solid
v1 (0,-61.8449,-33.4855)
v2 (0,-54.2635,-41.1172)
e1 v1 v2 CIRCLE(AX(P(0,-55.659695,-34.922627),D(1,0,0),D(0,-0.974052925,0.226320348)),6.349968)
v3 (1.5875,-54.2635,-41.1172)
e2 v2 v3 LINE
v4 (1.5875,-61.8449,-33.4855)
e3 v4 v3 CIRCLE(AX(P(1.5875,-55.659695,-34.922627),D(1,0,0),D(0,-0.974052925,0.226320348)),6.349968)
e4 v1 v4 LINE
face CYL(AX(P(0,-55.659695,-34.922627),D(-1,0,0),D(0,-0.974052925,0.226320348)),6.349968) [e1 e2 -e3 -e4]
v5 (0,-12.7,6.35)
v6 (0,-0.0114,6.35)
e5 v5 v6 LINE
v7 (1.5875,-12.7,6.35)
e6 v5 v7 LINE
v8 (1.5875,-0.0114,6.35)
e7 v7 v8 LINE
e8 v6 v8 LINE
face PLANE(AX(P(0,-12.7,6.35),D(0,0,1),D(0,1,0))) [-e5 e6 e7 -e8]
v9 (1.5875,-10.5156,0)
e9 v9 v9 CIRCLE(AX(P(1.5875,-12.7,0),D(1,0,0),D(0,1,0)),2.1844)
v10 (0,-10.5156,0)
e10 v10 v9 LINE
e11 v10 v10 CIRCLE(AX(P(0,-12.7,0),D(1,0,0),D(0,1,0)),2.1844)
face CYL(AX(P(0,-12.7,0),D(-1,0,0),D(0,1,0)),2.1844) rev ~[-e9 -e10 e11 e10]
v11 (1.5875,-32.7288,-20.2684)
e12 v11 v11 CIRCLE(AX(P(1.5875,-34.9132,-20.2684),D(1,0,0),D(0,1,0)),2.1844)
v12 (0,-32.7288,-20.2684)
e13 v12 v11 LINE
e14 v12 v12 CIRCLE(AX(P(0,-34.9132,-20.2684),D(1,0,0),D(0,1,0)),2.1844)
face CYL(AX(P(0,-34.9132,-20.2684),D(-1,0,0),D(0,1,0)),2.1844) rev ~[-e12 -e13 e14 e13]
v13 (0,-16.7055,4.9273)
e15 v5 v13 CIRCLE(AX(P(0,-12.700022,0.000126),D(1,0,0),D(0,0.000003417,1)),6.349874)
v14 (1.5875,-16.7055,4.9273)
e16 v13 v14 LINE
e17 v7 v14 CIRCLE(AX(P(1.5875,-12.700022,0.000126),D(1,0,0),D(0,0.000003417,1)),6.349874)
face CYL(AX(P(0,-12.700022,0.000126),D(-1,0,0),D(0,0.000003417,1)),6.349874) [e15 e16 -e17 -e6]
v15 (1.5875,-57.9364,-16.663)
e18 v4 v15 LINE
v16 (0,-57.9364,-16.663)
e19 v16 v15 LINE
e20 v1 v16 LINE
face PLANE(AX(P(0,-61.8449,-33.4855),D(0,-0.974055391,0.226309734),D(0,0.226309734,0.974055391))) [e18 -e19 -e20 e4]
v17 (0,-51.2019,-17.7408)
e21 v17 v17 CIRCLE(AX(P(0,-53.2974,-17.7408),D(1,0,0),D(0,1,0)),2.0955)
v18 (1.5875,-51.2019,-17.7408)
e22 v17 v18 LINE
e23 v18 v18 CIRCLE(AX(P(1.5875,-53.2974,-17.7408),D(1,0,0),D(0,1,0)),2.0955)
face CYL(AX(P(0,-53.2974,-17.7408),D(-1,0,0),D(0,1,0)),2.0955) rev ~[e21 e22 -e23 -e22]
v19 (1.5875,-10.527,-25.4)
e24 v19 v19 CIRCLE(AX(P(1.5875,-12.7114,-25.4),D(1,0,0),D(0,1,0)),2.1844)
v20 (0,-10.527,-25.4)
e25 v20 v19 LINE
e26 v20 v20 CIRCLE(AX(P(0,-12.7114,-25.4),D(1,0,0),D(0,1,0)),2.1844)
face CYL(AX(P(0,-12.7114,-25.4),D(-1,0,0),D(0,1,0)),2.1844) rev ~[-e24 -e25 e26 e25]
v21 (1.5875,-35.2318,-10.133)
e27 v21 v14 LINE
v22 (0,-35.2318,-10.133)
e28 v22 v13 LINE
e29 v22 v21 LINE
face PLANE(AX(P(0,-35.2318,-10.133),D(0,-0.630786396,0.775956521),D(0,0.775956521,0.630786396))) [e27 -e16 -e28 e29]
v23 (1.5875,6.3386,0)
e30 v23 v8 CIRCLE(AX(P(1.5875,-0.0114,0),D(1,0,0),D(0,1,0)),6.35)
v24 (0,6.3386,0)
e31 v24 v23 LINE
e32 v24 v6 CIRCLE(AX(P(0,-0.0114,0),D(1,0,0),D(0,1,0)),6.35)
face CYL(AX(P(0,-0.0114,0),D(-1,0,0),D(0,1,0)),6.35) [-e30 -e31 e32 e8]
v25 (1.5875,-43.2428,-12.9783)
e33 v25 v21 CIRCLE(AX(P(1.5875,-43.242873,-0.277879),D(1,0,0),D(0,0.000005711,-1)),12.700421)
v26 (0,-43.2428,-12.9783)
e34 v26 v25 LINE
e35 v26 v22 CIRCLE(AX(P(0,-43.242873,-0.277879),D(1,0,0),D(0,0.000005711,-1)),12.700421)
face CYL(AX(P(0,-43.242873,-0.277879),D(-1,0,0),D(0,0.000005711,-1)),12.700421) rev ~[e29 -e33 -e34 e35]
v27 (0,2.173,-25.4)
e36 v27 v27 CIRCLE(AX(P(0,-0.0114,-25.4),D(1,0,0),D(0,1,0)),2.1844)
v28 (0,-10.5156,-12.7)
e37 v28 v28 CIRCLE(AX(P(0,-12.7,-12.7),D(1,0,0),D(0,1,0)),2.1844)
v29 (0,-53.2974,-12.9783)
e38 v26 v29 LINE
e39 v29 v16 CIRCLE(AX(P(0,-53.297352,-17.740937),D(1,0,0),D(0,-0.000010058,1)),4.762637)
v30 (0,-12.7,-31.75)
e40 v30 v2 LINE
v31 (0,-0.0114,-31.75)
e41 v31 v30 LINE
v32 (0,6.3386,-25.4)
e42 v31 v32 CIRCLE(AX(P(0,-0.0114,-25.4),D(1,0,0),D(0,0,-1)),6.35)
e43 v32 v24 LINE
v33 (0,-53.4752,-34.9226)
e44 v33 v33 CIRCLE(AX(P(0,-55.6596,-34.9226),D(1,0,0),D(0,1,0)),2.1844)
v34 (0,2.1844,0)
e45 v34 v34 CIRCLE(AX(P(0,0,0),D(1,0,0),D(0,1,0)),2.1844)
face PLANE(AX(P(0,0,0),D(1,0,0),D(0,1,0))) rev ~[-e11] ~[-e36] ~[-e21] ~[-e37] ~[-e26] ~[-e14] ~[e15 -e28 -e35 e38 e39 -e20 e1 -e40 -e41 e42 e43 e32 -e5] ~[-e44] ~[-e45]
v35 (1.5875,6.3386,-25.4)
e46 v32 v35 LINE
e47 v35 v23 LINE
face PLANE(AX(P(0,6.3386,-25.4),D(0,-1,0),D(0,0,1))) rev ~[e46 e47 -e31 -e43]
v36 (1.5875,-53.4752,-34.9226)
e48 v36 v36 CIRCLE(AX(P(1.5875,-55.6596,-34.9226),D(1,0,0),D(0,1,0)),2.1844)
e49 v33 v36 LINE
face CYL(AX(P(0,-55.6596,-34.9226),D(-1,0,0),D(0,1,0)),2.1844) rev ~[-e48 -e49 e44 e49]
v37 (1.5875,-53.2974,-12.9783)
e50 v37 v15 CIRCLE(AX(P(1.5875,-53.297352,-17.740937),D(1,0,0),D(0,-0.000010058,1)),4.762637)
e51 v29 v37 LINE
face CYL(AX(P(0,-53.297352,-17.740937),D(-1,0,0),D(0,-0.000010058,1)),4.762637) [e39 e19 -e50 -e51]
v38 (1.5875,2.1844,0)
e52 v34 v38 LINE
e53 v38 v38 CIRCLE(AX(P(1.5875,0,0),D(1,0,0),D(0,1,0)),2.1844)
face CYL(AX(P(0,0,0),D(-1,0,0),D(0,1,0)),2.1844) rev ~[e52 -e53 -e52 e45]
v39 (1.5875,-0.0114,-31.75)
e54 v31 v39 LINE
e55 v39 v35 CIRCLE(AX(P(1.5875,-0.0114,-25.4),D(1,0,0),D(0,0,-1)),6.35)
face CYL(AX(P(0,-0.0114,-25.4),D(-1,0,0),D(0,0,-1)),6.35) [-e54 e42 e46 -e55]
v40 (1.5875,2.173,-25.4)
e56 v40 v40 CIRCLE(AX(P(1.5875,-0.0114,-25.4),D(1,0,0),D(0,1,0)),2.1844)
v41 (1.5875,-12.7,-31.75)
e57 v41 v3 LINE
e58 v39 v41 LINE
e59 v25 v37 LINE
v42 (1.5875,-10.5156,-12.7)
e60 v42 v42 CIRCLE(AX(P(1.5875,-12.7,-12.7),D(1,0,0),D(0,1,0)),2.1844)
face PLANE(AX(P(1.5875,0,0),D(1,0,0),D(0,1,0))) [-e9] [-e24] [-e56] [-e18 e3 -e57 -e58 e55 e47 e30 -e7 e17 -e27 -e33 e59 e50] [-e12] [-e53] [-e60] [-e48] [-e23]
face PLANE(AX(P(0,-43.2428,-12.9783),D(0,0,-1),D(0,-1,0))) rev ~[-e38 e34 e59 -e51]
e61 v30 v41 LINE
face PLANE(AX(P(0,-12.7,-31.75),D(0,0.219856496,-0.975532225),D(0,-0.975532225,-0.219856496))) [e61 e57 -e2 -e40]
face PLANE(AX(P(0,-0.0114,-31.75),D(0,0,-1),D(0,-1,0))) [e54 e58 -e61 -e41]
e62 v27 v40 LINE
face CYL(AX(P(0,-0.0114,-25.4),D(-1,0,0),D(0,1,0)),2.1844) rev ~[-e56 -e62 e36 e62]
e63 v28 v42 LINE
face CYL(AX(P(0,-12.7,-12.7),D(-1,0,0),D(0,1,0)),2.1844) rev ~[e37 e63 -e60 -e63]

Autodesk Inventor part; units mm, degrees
ref_plane "YZ Plane" through (0, 0, 0) normal (1, 0, 0) x (0, 1, 0)
ref_plane "XZ Plane" through (0, 0, 0) normal (0, 1, 0) x (-1, 0, 0)
ref_plane "XY Plane" through (0, 0, 0) normal (0, 0, 1) x (1, 0, 0)
sketch "maiin" plane through (0, 0, 0) normal (0, 0, 1) x (1, 0, 0)
  circle A0 centre (-6.5018, 3.4753) radius 2.1844
  line L0 (-6.8203, 13.6107) -> (11.7059, 28.671)
  circle A1 centre (-27.2482, -11.1789) radius 2.1844
  arc A2 (-33.4335, -9.7418) -> (-25.8521, -17.3735) centre (-27.2482, -11.1789) ccw
  line L1 (34.75, -1.6563) -> (34.75, 23.7437)
  line L2 (15.7114, 30.0937) -> (28.4, 30.0937)
  circle A3 centre (28.4114, 23.7437) radius 2.1844
  circle A4 centre (28.4, -1.6563) radius 2.1844
  circle A5 centre (15.7114, 23.7437) radius 2.1844
  circle A6 centre (15.7, -1.6563) radius 2.1844
  arc A7 (34.75, 23.7437) -> (28.4, 30.0937) centre (28.4, 23.7437) ccw
  arc A8 (15.7114, 30.0937) -> (11.7059, 28.671) centre (15.7114, 23.7437) ccw
  arc A9 (28.4, -8.0063) -> (34.75, -1.6563) centre (28.4, -1.6563) ccw
  line L3 (28.4, -8.0063) -> (15.7114, -8.0063)
  line L4 (15.7114, -8.0063) -> (-25.8521, -17.3735)
  circle A10 centre (-24.886, 6.0028) radius 2.0955
  arc A11 (-24.886, 10.7653) -> (-29.5249, 7.0806) centre (-24.886, 6.0028) ccw
  line L5 (-33.4335, -9.7418) -> (-29.5249, 7.0806)
  line L6 (-14.8313, 10.7653) -> (-24.886, 10.7653)
  arc A12 (-14.8313, 10.7653) -> (-6.8203, 13.6107) centre (-14.8313, 23.4653) ccw
  point P0 (10.0881, 4.3711)
  point P1 (32.8902, 28.2338)
  dimension "d0" = 12.7
  dimension "d6" = 4.3688
  dimension "d9" = 12.7
  dimension "d10" = 25.4
  dimension "d11" = 12.7
  dimension "d12" = 25.4
  dimension "d14" = 4.191
  dimension "d15" = 9.525
  dimension "d16" = 12.7
sketch "Sketch1" plane through (0, 0, 0) normal (1, 0, 0) x (0, 1, 0)
  circle A0 centre (-12.7, -12.7) radius 2.1844
  circle A1 centre (-34.9132, -20.2684) radius 2.1844
  line L0 (-35.2318, -10.133) -> (-16.7055, 4.9273)
  circle A2 centre (-55.6596, -34.9226) radius 2.1844
  arc A3 (-61.8449, -33.4855) -> (-54.2635, -41.1172) centre (-55.6596, -34.9226) ccw
  line L1 (6.3386, -25.4) -> (6.3386, 0)
  line L2 (-12.7, 6.35) -> (-0.0114, 6.35)
  circle A4 centre (0, 0) radius 2.1844
  circle A5 centre (-0.0114, -25.4) radius 2.1844
  circle A6 centre (-12.7, 0) radius 2.1844
  circle A7 centre (-12.7114, -25.4) radius 2.1844
  arc A8 (6.3386, 0) -> (-0.0114, 6.35) centre (-0.0114, 0) ccw
  arc A9 (-12.7, 6.35) -> (-16.7055, 4.9273) centre (-12.7, 0) ccw
  arc A10 (-0.0114, -31.75) -> (6.3386, -25.4) centre (-0.0114, -25.4) ccw
  line L3 (-0.0114, -31.75) -> (-12.7, -31.75)
  line L4 (-12.7, -31.75) -> (-54.2635, -41.1172)
  circle A11 centre (-53.2974, -17.7408) radius 2.0955
  arc A12 (-53.2974, -12.9783) -> (-57.9364, -16.663) centre (-53.2974, -17.7408) ccw
  line L5 (-61.8449, -33.4855) -> (-57.9364, -16.663)
  line L6 (-43.2428, -12.9783) -> (-53.2974, -12.9783)
  arc A13 (-43.2428, -12.9783) -> (-35.2318, -10.133) centre (-43.2428, -0.2783) ccw
  dimension "d17" = 4.3688
extrude "Extrusion1" add sketch "Sketch1" along normal blind 1.5875
properties part number "Angle Brace Gusset" material "Acetal Resin, White"
